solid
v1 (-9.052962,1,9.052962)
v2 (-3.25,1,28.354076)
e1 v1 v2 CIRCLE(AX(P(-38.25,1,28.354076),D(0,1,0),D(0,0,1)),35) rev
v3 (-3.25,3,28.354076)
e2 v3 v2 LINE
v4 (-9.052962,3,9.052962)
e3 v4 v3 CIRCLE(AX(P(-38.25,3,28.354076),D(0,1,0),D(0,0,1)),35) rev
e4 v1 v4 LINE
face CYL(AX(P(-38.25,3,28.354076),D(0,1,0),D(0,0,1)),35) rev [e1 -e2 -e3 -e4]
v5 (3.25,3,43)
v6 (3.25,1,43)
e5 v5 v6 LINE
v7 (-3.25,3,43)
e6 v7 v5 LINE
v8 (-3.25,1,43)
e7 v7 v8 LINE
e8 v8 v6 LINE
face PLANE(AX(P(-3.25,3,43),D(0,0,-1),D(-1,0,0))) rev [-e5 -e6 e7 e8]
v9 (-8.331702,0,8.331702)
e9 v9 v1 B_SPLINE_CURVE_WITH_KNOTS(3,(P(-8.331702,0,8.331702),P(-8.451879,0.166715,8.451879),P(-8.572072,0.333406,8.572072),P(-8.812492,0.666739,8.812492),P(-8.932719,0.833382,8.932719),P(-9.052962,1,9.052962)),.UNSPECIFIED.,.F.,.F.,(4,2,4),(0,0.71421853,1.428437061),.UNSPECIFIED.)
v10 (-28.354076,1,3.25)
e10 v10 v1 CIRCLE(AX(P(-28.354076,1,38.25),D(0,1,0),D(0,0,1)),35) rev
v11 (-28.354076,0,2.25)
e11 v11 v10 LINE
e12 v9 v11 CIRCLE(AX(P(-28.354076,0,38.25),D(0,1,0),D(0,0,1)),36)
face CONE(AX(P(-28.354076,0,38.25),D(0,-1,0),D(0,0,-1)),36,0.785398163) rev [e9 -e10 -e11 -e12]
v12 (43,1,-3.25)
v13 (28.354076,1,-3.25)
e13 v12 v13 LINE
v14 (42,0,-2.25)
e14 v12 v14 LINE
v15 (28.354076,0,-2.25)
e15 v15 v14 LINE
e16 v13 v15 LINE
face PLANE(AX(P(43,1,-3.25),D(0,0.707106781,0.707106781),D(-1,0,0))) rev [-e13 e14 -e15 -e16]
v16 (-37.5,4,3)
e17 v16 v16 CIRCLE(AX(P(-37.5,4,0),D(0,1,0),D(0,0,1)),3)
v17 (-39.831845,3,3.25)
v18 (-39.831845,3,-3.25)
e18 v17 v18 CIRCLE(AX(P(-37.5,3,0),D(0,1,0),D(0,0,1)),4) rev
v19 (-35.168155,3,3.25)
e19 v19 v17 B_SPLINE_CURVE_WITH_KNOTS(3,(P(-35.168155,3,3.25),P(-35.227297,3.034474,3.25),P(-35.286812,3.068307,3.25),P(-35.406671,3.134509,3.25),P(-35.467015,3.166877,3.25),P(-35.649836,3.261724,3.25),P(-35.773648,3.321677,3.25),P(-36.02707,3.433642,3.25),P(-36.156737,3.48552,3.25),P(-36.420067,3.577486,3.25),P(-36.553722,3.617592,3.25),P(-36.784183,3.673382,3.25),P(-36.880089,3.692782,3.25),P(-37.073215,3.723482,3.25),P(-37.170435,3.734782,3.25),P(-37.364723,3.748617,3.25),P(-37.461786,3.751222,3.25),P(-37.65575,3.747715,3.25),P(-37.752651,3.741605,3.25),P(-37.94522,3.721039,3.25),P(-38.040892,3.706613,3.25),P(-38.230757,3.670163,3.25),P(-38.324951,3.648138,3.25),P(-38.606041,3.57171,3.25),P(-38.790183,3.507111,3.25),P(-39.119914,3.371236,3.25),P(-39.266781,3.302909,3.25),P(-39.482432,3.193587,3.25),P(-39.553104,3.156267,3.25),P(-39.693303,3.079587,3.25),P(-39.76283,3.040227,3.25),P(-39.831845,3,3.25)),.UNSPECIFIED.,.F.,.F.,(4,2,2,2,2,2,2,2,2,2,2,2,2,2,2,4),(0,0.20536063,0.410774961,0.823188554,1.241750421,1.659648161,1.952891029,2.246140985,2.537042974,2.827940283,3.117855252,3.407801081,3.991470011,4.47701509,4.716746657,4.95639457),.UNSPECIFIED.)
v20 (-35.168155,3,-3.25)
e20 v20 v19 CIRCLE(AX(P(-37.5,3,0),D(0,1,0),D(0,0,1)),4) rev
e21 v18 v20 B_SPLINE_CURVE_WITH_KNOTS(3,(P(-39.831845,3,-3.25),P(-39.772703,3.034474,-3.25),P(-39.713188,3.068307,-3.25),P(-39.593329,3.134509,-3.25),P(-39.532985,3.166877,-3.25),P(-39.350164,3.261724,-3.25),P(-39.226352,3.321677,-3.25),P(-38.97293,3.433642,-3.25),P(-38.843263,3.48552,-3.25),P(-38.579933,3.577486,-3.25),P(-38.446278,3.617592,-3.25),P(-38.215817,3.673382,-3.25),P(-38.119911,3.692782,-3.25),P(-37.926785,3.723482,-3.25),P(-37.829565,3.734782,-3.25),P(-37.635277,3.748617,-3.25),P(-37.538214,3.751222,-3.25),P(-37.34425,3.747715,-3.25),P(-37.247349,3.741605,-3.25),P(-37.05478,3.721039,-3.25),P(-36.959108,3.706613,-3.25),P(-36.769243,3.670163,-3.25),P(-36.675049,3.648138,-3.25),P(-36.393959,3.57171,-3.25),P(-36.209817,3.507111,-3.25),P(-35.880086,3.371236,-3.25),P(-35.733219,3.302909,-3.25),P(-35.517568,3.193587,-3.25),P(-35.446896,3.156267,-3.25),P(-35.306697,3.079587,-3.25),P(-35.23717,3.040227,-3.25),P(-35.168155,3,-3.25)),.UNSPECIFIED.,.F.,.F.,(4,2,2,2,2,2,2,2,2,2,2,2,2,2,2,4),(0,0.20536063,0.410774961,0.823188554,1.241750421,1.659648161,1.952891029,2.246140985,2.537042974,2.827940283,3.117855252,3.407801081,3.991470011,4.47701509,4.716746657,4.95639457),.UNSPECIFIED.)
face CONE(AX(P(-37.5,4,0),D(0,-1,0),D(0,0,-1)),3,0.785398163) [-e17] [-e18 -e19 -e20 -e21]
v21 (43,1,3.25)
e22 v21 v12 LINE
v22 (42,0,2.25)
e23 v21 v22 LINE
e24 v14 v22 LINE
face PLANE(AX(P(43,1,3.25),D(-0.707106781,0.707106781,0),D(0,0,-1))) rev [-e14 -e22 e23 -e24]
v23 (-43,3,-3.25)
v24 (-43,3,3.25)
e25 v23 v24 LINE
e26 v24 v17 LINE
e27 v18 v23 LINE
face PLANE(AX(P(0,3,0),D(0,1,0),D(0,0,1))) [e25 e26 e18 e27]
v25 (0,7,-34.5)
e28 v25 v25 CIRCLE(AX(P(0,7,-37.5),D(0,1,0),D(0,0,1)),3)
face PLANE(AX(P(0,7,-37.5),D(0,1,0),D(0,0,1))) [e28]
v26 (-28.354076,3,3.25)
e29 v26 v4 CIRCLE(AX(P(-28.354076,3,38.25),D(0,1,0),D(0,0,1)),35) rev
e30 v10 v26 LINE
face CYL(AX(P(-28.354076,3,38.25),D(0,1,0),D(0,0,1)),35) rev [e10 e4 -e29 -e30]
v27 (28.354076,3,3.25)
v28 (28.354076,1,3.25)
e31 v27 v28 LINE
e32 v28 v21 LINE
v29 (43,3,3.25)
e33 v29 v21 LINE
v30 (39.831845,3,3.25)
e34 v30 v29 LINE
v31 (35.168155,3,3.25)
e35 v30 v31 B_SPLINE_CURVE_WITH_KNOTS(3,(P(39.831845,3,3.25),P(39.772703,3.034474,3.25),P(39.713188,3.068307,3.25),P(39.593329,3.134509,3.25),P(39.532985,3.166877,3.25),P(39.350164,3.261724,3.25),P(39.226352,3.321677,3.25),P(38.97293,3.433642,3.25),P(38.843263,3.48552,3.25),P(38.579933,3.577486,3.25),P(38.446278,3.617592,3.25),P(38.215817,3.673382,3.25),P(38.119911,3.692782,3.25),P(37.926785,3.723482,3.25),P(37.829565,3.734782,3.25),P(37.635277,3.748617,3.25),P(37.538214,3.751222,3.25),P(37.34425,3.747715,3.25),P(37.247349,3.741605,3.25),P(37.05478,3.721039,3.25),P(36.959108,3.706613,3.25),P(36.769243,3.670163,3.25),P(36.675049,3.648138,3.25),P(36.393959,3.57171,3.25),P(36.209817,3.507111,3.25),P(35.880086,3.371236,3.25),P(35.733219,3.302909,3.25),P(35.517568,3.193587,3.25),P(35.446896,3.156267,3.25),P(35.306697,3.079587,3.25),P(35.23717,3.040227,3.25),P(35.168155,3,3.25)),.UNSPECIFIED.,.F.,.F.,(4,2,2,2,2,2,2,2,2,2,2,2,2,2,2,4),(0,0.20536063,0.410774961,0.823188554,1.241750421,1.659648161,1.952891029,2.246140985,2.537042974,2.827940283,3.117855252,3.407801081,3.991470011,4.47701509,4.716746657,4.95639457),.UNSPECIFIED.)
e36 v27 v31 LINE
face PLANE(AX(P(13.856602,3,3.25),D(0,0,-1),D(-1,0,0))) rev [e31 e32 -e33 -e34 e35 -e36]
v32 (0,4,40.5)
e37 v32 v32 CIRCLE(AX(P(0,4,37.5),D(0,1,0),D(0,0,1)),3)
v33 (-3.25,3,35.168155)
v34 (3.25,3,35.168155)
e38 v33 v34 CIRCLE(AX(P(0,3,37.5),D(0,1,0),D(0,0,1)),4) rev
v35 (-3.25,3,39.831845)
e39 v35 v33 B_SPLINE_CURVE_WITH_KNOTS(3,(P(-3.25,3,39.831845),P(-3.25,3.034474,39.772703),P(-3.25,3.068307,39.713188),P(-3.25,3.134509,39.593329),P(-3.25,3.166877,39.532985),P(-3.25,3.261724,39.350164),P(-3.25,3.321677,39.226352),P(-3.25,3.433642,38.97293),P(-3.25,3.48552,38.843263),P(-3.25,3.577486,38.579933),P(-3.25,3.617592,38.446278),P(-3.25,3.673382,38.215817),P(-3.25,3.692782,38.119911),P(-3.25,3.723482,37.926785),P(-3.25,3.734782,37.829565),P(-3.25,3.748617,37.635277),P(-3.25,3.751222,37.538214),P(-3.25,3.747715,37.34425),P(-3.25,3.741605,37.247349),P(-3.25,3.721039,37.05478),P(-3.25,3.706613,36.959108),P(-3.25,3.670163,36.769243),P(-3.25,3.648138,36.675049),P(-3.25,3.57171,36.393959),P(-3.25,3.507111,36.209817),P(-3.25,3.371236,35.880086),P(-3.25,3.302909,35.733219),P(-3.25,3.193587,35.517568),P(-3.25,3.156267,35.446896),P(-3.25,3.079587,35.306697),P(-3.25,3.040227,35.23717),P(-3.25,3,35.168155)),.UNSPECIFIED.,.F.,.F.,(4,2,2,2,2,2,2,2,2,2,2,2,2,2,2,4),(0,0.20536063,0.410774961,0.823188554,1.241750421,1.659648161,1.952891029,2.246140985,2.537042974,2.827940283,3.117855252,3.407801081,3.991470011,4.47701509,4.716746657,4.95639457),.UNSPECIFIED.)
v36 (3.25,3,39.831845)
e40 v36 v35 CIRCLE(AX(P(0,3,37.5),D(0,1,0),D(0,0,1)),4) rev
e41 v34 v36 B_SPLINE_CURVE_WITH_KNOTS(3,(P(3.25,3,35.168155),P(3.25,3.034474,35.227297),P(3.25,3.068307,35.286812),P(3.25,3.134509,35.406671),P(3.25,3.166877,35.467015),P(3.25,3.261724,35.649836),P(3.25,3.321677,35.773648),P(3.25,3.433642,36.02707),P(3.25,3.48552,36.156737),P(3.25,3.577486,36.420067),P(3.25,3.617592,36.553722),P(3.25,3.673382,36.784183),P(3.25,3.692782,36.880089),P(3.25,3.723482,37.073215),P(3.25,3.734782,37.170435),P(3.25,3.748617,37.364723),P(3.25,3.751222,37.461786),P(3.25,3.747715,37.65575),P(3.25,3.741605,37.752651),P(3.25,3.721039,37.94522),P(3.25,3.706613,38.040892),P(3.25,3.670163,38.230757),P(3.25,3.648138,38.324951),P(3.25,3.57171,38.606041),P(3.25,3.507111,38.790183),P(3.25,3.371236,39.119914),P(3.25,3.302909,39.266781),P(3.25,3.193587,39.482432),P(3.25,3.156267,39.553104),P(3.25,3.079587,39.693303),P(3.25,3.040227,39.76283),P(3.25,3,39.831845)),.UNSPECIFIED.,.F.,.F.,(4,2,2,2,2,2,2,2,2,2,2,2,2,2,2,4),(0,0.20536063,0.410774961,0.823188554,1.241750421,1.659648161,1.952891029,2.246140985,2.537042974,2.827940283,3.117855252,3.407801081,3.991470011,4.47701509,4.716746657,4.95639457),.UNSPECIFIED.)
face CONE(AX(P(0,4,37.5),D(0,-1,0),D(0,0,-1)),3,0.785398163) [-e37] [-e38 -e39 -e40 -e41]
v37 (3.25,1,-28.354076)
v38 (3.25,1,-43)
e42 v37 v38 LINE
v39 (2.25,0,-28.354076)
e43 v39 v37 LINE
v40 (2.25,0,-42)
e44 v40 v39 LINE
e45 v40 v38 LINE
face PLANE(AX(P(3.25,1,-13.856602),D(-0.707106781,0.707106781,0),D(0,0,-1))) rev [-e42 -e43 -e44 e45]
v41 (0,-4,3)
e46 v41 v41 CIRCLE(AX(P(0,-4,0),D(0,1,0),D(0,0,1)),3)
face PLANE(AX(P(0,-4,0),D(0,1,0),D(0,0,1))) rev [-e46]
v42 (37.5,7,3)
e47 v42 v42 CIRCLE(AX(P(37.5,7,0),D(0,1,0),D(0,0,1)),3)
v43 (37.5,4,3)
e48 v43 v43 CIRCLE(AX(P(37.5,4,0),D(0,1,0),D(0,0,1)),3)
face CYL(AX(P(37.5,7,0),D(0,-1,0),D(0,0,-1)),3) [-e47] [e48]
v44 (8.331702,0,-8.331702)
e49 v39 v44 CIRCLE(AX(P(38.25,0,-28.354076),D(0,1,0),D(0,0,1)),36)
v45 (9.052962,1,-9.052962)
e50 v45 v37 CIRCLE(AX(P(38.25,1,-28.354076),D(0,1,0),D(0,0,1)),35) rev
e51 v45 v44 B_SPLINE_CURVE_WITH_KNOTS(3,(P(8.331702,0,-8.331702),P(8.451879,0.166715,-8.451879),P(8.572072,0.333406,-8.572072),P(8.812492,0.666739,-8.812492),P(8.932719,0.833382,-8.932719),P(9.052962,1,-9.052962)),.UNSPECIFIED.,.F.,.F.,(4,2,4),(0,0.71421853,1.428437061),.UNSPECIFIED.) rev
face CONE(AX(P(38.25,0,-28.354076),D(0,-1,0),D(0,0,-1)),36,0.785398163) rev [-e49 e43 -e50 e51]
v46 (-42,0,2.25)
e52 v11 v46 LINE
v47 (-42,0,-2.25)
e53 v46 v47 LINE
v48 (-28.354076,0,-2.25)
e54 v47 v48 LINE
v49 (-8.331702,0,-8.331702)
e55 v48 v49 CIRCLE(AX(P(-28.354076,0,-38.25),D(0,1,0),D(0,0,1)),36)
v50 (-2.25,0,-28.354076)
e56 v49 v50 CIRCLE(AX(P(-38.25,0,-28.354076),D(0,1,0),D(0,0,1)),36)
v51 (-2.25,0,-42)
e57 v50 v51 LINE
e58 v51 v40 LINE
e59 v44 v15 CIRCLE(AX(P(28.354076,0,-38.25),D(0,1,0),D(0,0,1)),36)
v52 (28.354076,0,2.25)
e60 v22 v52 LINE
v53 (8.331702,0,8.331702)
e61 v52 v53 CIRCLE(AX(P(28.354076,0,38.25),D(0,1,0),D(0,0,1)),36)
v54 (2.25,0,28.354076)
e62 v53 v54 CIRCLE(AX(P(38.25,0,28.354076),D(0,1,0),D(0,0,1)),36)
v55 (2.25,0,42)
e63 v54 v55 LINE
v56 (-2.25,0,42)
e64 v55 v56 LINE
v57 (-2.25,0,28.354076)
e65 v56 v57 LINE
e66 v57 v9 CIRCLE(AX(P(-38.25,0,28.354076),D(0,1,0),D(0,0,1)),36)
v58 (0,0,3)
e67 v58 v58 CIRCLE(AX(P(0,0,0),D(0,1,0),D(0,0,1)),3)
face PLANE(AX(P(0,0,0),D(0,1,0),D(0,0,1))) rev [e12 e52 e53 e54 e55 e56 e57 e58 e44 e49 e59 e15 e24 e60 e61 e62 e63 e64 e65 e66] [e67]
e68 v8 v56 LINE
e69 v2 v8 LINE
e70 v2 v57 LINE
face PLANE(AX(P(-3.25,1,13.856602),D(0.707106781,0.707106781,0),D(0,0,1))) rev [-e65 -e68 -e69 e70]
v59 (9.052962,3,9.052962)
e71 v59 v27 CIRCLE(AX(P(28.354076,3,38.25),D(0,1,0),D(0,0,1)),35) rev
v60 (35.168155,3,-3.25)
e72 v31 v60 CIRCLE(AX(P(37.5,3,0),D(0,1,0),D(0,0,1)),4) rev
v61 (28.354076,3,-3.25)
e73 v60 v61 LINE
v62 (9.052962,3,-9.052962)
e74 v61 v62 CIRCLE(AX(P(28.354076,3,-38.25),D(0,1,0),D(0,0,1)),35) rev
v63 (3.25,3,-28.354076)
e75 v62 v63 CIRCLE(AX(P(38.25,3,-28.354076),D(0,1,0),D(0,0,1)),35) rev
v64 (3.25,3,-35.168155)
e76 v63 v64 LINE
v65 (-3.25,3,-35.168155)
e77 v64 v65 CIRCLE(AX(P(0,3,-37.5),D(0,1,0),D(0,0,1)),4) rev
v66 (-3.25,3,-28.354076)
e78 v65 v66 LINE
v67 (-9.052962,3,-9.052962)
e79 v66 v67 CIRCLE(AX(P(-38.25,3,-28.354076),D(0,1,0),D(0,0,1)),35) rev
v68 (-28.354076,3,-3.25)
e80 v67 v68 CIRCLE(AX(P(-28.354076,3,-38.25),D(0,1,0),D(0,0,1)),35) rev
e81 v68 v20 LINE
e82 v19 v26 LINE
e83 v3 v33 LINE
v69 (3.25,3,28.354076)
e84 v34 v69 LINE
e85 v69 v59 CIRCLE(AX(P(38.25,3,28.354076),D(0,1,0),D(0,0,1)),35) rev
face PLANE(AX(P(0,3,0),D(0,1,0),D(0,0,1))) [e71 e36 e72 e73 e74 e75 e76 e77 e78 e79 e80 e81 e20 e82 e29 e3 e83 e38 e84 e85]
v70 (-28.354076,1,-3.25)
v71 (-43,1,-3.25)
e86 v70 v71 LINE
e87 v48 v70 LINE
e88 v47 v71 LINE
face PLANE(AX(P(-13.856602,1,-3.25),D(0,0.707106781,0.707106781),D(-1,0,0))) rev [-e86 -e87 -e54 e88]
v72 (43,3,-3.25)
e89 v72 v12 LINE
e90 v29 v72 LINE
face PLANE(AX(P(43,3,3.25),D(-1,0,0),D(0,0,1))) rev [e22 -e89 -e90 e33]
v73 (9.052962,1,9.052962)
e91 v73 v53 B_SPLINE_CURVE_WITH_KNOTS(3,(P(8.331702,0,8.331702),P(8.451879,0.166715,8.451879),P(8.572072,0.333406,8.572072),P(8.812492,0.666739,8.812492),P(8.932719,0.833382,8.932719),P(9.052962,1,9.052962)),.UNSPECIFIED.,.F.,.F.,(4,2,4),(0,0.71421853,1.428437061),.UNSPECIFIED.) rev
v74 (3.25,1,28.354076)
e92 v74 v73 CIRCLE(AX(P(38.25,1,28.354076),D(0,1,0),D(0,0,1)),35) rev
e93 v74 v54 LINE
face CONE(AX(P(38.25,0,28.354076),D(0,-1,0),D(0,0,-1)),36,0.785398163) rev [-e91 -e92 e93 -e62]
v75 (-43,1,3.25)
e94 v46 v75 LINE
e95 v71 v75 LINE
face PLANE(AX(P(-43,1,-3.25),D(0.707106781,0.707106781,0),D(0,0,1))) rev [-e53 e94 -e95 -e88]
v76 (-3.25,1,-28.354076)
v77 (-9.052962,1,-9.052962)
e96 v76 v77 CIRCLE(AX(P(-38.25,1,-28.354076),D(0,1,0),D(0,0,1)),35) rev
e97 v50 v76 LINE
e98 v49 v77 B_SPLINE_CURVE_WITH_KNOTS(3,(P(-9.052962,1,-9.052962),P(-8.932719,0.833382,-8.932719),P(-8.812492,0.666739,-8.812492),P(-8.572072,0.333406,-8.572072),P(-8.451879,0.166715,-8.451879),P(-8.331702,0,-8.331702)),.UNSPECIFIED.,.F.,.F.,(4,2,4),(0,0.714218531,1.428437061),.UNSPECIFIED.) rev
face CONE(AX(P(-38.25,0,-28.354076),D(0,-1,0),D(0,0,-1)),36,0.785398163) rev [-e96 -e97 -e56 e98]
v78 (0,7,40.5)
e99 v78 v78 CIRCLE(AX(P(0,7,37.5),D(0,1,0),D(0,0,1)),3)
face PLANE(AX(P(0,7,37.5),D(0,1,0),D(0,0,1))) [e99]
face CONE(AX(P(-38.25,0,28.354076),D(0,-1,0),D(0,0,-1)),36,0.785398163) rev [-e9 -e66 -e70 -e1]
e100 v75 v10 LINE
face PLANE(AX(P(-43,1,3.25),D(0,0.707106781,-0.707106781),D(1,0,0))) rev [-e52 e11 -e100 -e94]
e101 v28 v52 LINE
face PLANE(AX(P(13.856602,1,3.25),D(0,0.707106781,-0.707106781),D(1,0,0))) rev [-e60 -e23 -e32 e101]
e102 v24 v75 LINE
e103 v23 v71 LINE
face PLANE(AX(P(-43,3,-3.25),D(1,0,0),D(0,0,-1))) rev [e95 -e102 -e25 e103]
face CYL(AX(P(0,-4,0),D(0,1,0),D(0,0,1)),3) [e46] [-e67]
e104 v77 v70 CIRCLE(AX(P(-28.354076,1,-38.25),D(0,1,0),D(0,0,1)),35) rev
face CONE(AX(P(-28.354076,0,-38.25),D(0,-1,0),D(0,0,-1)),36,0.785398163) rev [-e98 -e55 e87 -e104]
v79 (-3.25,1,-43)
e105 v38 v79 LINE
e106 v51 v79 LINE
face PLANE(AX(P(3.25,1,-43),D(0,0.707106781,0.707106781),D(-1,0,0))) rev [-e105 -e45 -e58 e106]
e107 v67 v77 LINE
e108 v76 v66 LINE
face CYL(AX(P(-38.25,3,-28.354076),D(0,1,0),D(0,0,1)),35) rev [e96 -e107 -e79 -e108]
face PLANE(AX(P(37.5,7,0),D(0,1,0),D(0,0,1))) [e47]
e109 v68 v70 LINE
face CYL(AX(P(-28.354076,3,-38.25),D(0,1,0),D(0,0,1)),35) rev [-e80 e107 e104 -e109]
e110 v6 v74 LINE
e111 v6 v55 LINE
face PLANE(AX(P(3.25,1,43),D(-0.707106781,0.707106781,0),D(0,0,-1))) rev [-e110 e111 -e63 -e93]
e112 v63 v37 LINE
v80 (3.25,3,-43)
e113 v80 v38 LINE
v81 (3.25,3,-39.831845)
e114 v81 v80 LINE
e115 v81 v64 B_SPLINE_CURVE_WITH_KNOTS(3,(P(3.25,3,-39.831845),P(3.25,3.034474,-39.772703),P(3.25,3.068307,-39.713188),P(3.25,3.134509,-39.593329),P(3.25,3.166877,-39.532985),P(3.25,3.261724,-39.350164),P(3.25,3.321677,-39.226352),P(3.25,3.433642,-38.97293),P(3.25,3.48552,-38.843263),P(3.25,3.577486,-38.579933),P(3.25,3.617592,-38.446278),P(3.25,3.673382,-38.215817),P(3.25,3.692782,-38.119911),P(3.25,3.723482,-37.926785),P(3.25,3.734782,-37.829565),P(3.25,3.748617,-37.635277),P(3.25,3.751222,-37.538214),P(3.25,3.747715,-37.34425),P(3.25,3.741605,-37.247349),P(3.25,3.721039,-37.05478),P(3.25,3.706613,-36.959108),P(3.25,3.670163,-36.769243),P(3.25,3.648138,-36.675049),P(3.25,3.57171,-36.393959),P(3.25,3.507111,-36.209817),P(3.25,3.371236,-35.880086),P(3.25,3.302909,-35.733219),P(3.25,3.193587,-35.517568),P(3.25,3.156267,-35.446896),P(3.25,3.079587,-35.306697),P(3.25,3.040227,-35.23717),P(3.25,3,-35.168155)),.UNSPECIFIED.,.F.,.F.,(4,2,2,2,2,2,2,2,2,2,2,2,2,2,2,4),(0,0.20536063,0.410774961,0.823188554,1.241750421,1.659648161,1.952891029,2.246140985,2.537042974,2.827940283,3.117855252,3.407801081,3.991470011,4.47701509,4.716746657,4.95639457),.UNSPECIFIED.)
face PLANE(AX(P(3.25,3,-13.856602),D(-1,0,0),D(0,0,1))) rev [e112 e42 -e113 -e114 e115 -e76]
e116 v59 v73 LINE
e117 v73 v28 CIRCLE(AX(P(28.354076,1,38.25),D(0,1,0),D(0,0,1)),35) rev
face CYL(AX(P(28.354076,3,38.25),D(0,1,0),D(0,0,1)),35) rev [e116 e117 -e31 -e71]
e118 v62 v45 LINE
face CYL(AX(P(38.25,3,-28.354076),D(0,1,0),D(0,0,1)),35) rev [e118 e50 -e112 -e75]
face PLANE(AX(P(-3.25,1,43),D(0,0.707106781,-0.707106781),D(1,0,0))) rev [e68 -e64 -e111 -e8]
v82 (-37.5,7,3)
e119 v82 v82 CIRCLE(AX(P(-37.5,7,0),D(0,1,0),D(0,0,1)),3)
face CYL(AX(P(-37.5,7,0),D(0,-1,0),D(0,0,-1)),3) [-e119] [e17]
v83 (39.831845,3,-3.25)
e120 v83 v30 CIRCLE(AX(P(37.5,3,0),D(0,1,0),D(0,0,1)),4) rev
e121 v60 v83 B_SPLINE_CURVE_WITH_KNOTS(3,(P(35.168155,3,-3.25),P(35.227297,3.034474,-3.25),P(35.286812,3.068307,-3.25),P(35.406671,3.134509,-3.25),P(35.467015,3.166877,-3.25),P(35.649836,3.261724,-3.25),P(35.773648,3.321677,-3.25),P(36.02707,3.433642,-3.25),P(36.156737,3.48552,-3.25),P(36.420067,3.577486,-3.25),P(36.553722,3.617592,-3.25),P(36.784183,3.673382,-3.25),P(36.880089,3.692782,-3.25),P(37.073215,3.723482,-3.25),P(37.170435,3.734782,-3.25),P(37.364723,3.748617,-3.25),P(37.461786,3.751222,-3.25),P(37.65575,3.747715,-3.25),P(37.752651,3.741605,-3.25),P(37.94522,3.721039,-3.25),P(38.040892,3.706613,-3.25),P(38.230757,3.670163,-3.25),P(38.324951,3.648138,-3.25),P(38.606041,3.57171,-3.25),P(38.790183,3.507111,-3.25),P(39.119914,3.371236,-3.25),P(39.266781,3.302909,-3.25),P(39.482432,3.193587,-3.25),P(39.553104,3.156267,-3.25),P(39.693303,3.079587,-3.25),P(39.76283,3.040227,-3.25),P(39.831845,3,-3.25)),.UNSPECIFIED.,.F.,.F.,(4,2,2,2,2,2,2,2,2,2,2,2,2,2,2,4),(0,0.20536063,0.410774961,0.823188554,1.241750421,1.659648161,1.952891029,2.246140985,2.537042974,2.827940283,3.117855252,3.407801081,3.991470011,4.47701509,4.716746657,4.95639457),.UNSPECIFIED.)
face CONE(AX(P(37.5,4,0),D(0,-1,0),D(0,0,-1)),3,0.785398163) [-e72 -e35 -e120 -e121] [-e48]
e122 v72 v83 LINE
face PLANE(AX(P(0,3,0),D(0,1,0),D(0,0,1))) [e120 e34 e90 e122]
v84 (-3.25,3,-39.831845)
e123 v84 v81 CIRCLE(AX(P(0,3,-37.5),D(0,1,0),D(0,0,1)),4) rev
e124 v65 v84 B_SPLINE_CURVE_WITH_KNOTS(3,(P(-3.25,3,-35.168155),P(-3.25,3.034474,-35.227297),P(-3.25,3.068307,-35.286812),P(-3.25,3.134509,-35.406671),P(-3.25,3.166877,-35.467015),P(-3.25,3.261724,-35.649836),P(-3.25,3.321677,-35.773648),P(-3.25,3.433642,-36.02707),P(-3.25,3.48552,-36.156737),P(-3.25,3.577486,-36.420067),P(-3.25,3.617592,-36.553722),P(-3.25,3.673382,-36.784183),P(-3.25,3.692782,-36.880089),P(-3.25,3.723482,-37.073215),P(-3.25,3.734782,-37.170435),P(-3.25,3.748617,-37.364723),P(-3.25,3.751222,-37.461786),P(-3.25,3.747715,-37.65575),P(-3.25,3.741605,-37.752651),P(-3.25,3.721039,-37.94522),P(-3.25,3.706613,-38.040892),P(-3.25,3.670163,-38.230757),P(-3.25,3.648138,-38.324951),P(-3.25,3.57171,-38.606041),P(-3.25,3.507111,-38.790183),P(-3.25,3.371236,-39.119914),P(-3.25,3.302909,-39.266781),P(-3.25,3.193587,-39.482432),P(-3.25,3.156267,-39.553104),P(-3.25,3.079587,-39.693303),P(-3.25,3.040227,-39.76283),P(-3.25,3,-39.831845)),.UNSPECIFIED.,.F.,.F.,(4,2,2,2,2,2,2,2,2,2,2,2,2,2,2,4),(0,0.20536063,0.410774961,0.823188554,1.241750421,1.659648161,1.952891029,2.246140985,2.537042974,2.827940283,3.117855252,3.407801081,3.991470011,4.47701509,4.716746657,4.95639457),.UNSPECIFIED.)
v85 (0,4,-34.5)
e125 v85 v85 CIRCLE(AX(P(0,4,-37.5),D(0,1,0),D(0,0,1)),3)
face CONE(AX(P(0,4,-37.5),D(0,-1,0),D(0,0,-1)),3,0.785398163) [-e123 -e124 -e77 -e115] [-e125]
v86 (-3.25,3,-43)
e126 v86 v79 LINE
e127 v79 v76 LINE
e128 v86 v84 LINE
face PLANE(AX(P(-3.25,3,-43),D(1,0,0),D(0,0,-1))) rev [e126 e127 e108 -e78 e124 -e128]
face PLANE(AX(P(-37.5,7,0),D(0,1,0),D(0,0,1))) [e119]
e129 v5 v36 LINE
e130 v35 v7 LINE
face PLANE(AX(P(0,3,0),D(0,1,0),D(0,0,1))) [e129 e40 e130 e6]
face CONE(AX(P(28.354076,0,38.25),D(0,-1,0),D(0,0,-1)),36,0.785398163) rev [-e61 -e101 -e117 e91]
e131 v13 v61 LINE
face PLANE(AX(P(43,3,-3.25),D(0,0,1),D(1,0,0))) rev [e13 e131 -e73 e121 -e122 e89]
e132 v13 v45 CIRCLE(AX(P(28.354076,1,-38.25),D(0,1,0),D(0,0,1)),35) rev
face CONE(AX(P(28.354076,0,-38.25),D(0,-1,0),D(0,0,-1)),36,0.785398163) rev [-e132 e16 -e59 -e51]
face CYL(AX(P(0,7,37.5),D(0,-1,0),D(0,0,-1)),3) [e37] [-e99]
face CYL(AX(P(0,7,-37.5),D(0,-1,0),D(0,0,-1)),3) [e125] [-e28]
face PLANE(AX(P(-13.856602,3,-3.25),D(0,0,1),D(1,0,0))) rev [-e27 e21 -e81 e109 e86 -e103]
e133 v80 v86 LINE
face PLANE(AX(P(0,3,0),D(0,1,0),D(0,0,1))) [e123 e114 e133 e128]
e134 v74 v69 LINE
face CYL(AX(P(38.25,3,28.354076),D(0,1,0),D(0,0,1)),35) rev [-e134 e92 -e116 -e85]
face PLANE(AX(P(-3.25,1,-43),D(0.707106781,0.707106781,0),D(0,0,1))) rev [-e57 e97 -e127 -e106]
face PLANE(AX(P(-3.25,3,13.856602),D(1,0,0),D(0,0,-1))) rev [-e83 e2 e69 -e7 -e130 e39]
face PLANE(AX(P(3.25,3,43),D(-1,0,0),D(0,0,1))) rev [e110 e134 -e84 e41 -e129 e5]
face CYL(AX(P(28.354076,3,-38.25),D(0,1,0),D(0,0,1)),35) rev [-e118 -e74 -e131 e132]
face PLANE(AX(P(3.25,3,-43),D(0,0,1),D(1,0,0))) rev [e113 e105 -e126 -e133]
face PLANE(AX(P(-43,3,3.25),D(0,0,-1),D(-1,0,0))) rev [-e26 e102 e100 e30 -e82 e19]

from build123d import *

# Parameters (mm, degrees)
SKETCH1_R           = 3
BOSS_EXTRUDE1_DEPTH = 4
BOSS_EXTRUDE2_DEPTH = 3
SKETCH3_R           = 3
BOSS_EXTRUDE3_DEPTH = 4
FILLET2_R           = 35
CHAMFER1_SIZE       = 1
CHAMFER2_SIZE       = 1


with BuildPart() as part:
    # Sketch1 → Boss-Extrude1 (new body)
    with BuildSketch(Plane(origin=(0, 0, 0), x_dir=(1, 0, 0), z_dir=(0, 1, 0))):
        with Locations(Location((0, 0, 0), (0, 0, 270))):
            Circle(SKETCH1_R)
    extrude(amount=-BOSS_EXTRUDE1_DEPTH)

    # Sketch2 → Boss-Extrude2 (add)
    with BuildSketch(Plane(origin=(0, 0, 0), x_dir=(1, 0, 0), z_dir=(0, 1, 0))):
        Polygon((-3.25, 43), (-3.25, 13.856601718), (-13.856601718, 3.25), (-43, 3.25), (-43, -3.25), (-13.856601718, -3.25), (-3.25, -13.856601718), (-3.25, -43), (3.25, -43), (3.25, -13.856601718), (13.856601718, -3.25), (43, -3.25), (43, 3.25), (13.856601718, 3.25), (3.25, 13.856601718), (3.25, 43), align=None)
    extrude(amount=BOSS_EXTRUDE2_DEPTH)

    # Sketch3 → Boss-Extrude3 (add)
    with BuildSketch(Plane(origin=(0, 3, 0), x_dir=(1, 0, 0), z_dir=(0, 1, 0))):
        with Locations(Location((-37.5, 0, 0), (0, 0, 270))):
            Circle(SKETCH3_R)
        with Locations(Location((0, 37.5, 0), (0, 0, 270))):
            Circle(SKETCH3_R)
        with Locations(Location((37.5, 0, 0), (0, 0, 270))):
            Circle(SKETCH3_R)
        with Locations(Location((0, -37.5, 0), (0, 0, 270))):
            Circle(SKETCH3_R)
    extrude(amount=BOSS_EXTRUDE3_DEPTH)

    # Fillet2
    # the kernel refuses this fillet: 35 mm, written as the material it adds along each edge
    with BuildSketch(Plane(origin=(-13.856601718, 0, -3.25), x_dir=(0.7071067811865472, 0, -0.7071067811865478), z_dir=(0, 1, 0)), Plane(origin=(-3.25, 0, -13.856601718), x_dir=(0, 0, -1), z_dir=(0, 1, 0)), Plane(origin=(-13.856601718, 0, 3.25), x_dir=(-1, 0, 0), z_dir=(0, 1, 0)), Plane(origin=(-3.25, 0, 13.856601718), x_dir=(-0.7071067811865476, 0, -0.7071067811865475), z_dir=(0, 1, 0))) as fillet2_piece_1:
        with BuildLine():
            CenterArc((FILLET2_R * 0.414213562373, FILLET2_R), FILLET2_R, 225, 45)
            Line((-FILLET2_R * 0.292893218813, FILLET2_R * 0.292893218813), (0, 0))
            Line((0, 0), (FILLET2_R * 0.414213562373, 0))
        make_face()
    extrude(amount=3)
    with BuildSketch(Plane(origin=(3.25, 0, -13.856601718), x_dir=(0, 0, -1), z_dir=(0, 1, 0)), Plane(origin=(13.856601718, 0, -3.25), x_dir=(-0.7071067811865475, 0, -0.7071067811865476), z_dir=(0, 1, 0)), Plane(origin=(13.856601718, 0, 3.25), x_dir=(1, 0, 0), z_dir=(0, 1, 0)), Plane(origin=(3.25, 0, 13.856601718), x_dir=(0.7071067811865477, 0, -0.7071067811865474), z_dir=(0, 1, 0))) as fillet2_piece_2:
        with BuildLine():
            CenterArc((FILLET2_R * 0.414213562373, -FILLET2_R), FILLET2_R, 90, 45)
            Line((-FILLET2_R * 0.292893218813, -FILLET2_R * 0.292893218813), (0, 0))
            Line((0, 0), (FILLET2_R * 0.414213562373, 0))
        make_face()
    extrude(amount=3)

    # Chamfer1
    # the kernel refuses this chamfer: 1 mm, written as the material it adds along each edge
    with BuildSketch(Plane(origin=(-37.5, 3, 0), x_dir=(0, 0, 1), z_dir=(-1, 0, 0))) as chamfer1_piece_1_section:
        Polygon((3 + CHAMFER1_SIZE, 0), (3, CHAMFER1_SIZE), (3, 0), align=None)
    chamfer1_piece_1 = revolve(axis=Axis((-37.5, 3, 0), (0, 1, 0)), mode=Mode.PRIVATE)
    chamfer1_piece_1 = split(chamfer1_piece_1, bisect_by=Plane(origin=(-34.177083345, 3.132594622, 3.25), z_dir=(0, 0, -1)), keep=Keep.TOP, mode=Mode.PRIVATE)
    chamfer1_piece_1 = split(chamfer1_piece_1, bisect_by=Plane(origin=(-34.177083345, 3.132594622, -3.25), z_dir=(0, 0, 1)), keep=Keep.TOP, mode=Mode.PRIVATE)
    add(chamfer1_piece_1)
    with BuildSketch(Plane(origin=(0, 3, -37.5), x_dir=(0, 0, 1), z_dir=(-1, 0, 0))) as chamfer1_piece_2_section:
        Polygon((3 + CHAMFER1_SIZE, 0), (3, CHAMFER1_SIZE), (3, 0), align=None)
    chamfer1_piece_2 = revolve(axis=Axis((0, 3, -37.5), (0, 1, 0)), mode=Mode.PRIVATE)
    chamfer1_piece_2 = split(chamfer1_piece_2, bisect_by=Plane(origin=(-3.25, 3.484784137, -40.984784137), z_dir=(1, 0, 0)), keep=Keep.TOP, mode=Mode.PRIVATE)
    chamfer1_piece_2 = split(chamfer1_piece_2, bisect_by=Plane(origin=(3.25, 3.484784137, -40.984784137), z_dir=(-1, 0, 0)), keep=Keep.TOP, mode=Mode.PRIVATE)
    add(chamfer1_piece_2)
    with BuildSketch(Plane(origin=(37.5, 3, 0), x_dir=(0, 0, 1), z_dir=(-1, 0, 0))) as chamfer1_piece_3_section:
        Polygon((3 + CHAMFER1_SIZE, 0), (3, CHAMFER1_SIZE), (3, 0), align=None)
    chamfer1_piece_3 = revolve(axis=Axis((37.5, 3, 0), (0, 1, 0)), mode=Mode.PRIVATE)
    chamfer1_piece_3 = split(chamfer1_piece_3, bisect_by=Plane(origin=(40.822916655, 3.132594622, -3.25), z_dir=(0, 0, 1)), keep=Keep.TOP, mode=Mode.PRIVATE)
    chamfer1_piece_3 = split(chamfer1_piece_3, bisect_by=Plane(origin=(40.822916655, 3.132594622, 3.25), z_dir=(0, 0, -1)), keep=Keep.TOP, mode=Mode.PRIVATE)
    add(chamfer1_piece_3)
    with BuildSketch(Plane(origin=(0, 3, 37.5), x_dir=(0, 0, 1), z_dir=(-1, 0, 0))) as chamfer1_piece_4_section:
        Polygon((3 + CHAMFER1_SIZE, 0), (3, CHAMFER1_SIZE), (3, 0), align=None)
    chamfer1_piece_4 = revolve(axis=Axis((0, 3, 37.5), (0, 1, 0)), mode=Mode.PRIVATE)
    chamfer1_piece_4 = split(chamfer1_piece_4, bisect_by=Plane(origin=(3.25, 3.484784137, 34.015215863), z_dir=(-1, 0, 0)), keep=Keep.TOP, mode=Mode.PRIVATE)
    chamfer1_piece_4 = split(chamfer1_piece_4, bisect_by=Plane(origin=(-3.25, 3.484784137, 34.015215863), z_dir=(1, 0, 0)), keep=Keep.TOP, mode=Mode.PRIVATE)
    add(chamfer1_piece_4)

    # Chamfer2
    chamfer2_edges = [part.edges().sort_by_distance(p)[0] for p in [
        (-3.25, 0, 35.6770382),
        (3.25, 0, 35.6770382),
        (0, 0, 43),
        (3.25, 0, -35.6770382),
        (-3.25, 0, -35.6770382),
        (-4.732121832, 0, -18.276782958),
        (-18.276782958, 0, -4.732121832),
        (-35.6770382, 0, -3.25),
        (-35.6770382, 0, 3.25),
        (-18.276782958, 0, 4.732121832),
        (-4.732121832, 0, 18.276782958),
        (4.732121832, 0, 18.276782958),
        (18.276782958, 0, 4.732121832),
        (35.6770382, 0, 3.25),
        (35.6770382, 0, -3.25),
        (18.276782958, 0, -4.732121832),
        (4.732121832, 0, -18.276782958),
        (43, 0, 0),
        (-43, 0, 0),
        (0, 0, -43),
    ]]
    chamfer(chamfer2_edges, length=CHAMFER2_SIZE)


solid = part.part
